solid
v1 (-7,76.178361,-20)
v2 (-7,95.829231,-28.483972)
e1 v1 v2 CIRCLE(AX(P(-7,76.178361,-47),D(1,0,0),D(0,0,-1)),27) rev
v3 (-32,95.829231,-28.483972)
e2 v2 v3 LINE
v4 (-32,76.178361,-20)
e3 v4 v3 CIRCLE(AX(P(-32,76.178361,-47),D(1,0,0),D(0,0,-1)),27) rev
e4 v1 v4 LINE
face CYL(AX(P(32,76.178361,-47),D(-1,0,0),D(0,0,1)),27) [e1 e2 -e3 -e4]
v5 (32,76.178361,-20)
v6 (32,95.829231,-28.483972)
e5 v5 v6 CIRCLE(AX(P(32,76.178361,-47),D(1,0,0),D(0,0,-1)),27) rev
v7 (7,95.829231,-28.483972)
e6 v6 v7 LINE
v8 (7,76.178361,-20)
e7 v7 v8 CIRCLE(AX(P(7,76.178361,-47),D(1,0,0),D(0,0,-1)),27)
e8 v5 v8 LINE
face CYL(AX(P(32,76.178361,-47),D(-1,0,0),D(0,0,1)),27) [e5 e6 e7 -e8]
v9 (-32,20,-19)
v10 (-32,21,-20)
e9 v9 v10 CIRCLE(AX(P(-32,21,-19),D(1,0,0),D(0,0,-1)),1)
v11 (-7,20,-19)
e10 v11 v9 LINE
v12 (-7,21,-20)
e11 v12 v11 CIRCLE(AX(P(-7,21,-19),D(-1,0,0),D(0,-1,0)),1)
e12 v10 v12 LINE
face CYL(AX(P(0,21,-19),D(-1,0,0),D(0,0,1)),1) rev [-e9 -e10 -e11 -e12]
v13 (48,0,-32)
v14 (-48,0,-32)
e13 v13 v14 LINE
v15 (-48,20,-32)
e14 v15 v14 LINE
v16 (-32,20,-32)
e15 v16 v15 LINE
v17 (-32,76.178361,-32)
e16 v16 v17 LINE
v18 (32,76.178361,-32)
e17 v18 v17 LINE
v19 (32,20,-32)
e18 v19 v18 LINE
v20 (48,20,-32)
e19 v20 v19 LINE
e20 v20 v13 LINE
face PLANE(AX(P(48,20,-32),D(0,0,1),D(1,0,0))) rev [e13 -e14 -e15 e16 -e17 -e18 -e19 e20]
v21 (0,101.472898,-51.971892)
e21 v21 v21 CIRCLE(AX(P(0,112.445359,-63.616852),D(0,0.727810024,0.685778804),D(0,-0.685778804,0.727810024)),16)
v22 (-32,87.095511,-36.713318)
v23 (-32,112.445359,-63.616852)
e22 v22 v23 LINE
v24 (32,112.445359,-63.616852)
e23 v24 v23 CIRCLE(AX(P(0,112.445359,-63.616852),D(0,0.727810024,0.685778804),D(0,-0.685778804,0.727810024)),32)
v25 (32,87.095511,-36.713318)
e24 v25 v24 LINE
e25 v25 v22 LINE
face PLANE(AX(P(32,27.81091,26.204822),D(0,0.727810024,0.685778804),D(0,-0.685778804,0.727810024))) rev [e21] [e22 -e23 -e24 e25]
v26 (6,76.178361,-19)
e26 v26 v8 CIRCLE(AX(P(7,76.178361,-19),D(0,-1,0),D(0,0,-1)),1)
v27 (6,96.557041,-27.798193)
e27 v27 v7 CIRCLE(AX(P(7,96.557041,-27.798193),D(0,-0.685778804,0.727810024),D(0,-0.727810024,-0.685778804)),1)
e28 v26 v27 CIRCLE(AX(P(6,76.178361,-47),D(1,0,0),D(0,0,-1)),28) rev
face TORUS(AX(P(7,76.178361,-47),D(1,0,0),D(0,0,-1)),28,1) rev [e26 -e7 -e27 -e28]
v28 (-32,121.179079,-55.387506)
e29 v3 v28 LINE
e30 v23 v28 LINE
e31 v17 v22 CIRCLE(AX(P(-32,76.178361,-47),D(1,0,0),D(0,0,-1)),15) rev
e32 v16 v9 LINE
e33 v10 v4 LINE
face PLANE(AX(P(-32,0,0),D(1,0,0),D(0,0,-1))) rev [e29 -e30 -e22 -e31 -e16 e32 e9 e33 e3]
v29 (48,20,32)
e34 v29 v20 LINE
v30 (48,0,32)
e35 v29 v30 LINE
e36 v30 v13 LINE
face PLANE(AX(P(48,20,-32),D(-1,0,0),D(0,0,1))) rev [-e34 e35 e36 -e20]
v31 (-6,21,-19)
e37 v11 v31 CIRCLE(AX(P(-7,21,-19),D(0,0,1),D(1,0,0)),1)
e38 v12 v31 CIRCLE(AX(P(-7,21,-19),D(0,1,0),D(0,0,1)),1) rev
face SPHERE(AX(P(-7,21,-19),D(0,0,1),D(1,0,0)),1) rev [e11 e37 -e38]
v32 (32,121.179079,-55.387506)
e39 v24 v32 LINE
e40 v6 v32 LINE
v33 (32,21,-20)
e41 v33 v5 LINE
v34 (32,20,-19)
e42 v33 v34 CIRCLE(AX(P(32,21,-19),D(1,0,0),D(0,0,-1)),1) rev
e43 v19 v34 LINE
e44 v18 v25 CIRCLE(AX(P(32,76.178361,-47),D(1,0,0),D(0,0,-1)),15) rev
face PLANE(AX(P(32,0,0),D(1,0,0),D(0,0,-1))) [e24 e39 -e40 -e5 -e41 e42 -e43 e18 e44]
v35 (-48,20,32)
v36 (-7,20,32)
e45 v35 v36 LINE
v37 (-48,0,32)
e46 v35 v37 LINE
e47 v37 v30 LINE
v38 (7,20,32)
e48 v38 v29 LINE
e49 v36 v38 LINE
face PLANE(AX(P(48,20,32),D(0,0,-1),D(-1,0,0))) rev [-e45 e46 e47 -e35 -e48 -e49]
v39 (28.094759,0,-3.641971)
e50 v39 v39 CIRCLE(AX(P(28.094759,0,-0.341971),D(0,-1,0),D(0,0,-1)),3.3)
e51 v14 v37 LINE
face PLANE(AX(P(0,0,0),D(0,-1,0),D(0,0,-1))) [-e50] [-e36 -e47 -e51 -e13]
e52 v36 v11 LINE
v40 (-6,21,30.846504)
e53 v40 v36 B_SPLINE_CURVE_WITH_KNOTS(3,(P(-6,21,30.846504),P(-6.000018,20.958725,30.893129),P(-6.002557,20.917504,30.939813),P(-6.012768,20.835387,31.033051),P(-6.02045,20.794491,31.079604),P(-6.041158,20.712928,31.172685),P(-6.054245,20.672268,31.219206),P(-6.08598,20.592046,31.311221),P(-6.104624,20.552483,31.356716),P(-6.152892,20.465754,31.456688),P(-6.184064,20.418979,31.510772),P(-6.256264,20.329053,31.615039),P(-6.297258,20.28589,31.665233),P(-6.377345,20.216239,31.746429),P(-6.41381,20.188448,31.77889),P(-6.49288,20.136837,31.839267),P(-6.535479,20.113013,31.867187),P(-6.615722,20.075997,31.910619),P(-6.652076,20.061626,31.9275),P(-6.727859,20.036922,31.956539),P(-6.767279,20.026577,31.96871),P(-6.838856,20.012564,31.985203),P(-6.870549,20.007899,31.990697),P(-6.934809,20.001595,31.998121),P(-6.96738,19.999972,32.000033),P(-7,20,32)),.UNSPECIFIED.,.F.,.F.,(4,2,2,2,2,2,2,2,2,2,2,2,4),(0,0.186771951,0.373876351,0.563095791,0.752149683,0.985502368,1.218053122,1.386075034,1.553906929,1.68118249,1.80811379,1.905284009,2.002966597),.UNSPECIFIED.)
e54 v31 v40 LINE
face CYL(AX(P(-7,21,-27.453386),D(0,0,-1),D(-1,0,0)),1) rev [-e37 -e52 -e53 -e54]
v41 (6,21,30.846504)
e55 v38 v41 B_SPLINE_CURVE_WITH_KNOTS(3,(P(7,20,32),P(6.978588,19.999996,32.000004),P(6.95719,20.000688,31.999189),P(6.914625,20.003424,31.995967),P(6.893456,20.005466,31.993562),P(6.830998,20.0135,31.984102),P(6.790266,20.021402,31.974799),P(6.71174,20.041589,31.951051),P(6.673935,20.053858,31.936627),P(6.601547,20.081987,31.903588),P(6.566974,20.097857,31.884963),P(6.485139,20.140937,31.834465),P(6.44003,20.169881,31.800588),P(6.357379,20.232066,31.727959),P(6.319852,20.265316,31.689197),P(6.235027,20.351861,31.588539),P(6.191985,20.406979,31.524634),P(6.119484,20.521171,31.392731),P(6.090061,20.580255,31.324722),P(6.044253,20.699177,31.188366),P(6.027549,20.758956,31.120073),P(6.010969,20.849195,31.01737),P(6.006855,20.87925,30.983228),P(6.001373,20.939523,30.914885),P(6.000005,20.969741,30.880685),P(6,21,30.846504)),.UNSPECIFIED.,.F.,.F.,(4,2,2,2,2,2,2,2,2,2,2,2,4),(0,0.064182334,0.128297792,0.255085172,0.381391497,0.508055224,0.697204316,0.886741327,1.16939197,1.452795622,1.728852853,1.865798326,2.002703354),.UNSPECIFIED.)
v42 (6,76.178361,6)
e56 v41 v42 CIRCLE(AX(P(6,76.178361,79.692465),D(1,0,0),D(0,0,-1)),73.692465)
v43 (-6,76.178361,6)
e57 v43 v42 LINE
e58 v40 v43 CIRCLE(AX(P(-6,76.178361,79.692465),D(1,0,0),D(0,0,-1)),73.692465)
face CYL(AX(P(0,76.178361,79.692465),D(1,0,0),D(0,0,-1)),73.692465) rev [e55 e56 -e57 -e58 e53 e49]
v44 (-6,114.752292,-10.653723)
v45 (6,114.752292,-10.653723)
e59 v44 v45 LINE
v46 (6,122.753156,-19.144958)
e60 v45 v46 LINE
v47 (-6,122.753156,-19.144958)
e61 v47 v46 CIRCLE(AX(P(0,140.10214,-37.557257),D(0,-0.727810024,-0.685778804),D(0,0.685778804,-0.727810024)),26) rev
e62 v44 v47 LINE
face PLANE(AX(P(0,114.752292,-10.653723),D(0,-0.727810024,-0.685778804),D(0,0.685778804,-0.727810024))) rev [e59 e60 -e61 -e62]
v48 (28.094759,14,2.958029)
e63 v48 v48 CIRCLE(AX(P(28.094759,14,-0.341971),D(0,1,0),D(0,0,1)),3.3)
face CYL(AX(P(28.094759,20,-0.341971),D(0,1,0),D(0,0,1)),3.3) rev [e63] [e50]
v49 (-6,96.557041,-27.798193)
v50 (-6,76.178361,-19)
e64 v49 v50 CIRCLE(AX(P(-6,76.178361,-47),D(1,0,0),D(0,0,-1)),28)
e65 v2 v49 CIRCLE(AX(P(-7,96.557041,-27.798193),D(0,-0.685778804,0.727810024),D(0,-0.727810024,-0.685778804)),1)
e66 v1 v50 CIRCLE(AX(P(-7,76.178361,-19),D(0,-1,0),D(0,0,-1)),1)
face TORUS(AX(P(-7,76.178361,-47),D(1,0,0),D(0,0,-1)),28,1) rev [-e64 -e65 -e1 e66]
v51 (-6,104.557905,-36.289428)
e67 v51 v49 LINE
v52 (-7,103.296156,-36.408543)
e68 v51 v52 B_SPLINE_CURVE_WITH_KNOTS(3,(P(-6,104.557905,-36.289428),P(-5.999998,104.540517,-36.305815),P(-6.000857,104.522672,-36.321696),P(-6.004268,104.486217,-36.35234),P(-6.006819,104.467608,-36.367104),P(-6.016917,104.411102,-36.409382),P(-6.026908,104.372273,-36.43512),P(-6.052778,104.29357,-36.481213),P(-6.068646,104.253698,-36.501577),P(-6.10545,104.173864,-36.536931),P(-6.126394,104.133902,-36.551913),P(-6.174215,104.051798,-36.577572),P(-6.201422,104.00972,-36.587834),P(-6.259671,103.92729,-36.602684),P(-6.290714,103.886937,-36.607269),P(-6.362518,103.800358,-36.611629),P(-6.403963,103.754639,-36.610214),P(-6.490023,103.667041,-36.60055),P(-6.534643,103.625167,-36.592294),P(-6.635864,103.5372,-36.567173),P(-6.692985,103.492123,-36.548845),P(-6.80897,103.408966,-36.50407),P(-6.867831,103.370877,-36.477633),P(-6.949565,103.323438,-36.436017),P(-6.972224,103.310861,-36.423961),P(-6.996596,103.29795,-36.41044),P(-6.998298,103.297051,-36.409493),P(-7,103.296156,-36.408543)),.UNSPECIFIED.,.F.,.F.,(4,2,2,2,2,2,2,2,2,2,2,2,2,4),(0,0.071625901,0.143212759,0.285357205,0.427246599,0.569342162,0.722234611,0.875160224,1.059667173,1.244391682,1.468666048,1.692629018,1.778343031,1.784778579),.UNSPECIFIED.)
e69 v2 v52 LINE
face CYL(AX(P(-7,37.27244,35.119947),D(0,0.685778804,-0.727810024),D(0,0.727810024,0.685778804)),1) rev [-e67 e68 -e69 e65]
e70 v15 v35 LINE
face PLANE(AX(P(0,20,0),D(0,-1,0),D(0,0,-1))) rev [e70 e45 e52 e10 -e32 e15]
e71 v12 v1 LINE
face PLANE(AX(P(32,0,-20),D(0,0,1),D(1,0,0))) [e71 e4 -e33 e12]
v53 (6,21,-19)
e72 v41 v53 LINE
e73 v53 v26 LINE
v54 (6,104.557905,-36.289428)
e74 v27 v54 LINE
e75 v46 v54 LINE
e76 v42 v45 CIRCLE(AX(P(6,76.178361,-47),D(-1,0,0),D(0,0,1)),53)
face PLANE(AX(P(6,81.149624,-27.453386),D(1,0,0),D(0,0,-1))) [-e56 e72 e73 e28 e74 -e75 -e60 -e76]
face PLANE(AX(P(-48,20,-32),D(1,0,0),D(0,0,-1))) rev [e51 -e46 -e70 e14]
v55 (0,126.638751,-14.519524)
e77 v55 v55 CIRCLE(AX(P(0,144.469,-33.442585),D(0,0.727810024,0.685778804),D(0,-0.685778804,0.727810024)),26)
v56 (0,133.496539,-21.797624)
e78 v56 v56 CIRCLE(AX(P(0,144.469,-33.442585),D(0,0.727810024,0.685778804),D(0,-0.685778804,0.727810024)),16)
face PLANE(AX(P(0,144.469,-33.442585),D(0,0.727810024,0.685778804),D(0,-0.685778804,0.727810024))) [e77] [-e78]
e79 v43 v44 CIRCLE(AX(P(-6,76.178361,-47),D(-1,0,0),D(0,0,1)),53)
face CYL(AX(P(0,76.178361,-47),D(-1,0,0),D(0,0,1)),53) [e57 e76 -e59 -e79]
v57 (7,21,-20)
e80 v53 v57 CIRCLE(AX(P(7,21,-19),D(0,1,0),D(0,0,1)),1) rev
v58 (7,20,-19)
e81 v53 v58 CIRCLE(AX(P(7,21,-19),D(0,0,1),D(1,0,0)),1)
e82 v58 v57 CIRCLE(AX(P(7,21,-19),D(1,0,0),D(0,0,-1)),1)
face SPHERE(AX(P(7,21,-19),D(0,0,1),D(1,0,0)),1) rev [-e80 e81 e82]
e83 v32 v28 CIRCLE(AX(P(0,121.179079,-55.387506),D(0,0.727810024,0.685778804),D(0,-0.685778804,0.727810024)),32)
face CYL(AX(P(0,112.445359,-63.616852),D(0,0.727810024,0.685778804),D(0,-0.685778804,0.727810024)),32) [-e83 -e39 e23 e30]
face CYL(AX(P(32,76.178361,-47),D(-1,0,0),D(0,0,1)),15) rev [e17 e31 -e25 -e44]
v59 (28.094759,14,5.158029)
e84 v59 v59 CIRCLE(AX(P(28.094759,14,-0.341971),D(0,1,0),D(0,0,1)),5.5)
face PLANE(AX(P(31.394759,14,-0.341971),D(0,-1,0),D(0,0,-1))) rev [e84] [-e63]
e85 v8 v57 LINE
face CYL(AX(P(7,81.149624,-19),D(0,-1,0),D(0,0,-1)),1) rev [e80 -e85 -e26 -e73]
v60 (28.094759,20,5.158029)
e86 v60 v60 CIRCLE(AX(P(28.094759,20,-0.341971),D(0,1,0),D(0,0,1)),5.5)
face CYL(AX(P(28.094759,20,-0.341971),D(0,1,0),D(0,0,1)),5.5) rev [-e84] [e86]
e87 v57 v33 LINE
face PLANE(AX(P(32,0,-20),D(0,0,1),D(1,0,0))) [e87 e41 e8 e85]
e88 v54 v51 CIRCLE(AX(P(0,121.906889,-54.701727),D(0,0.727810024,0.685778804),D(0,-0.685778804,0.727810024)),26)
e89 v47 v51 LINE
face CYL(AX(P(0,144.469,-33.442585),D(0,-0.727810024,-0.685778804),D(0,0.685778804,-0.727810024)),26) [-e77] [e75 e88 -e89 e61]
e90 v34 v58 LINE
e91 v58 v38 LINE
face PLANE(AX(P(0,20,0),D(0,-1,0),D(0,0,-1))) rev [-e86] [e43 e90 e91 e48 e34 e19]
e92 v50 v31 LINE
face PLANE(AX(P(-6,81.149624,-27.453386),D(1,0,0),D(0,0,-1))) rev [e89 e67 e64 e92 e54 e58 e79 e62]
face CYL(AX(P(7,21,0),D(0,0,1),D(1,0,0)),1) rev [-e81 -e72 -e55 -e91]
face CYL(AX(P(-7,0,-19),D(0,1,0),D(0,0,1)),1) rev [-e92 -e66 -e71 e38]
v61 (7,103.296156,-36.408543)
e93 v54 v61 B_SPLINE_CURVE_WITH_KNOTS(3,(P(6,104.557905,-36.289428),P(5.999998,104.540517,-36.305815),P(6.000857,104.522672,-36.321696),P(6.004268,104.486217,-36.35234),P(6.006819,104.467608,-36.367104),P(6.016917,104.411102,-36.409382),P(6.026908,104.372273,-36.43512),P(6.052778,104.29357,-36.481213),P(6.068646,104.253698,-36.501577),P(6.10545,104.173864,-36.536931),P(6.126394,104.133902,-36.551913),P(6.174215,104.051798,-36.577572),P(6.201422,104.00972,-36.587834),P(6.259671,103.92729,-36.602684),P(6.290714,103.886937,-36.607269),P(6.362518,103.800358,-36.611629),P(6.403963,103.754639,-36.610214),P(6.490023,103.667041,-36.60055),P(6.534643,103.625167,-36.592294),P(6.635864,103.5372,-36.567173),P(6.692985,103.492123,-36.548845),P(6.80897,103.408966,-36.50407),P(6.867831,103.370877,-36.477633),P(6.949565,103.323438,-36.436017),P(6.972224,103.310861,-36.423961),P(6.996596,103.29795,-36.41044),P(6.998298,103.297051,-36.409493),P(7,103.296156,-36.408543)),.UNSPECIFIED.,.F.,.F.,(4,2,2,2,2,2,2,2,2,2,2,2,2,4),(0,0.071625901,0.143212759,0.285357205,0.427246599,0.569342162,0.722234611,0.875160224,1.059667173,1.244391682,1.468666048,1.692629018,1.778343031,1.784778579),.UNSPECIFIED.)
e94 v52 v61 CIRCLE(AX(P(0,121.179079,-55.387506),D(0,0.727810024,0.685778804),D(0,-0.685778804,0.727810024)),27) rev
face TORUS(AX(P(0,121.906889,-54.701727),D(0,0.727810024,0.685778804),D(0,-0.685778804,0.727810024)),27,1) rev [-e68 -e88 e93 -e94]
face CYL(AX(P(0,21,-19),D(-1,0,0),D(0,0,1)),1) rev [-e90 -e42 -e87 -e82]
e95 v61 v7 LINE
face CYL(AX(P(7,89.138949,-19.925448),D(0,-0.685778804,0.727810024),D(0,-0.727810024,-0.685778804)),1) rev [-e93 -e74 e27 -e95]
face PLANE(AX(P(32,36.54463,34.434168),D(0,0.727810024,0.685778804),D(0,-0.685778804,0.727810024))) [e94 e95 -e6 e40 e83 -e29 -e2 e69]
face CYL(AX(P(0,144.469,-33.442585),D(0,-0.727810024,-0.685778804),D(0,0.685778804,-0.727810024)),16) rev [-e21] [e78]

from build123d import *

# Parameters (mm, degrees)
SKETCH4_W                      = 96
SKETCH4_H                      = 64
BOSS_EXTRUDE1_DEPTH            = 20
BOSS_EXTRUDE2_DEPTH            = 32
BOSS_EXTRUDE3_DEPTH            = 12
SKETCH7_R                      = 26
SKETCH7_R_2                    = 16
BOSS_EXTRUDE4_DEPTH            = 32
CUT_EXTRUDE1_START             = -32
SKETCH8_R                      = 16
CUT_EXTRUDE1_DEPTH             = 32
RIB1_START                     = -6
RIB1_DEPTH                     = 12
FILLET1_R                      = 1
CBORE_FOR_M6_SHCS2_D           = 6.6
CBORE_FOR_M6_SHCS2_CBORE_D     = 11
CBORE_FOR_M6_SHCS2_CBORE_DEPTH = 6


with BuildPart() as part:
    # Sketch4 → Boss-Extrude1 (new body)
    with BuildSketch(Plane(origin=(0, 0, 0), x_dir=(1, 0, 0), z_dir=(0, 1, 0))):
        Rectangle(SKETCH4_W, SKETCH4_H)
    extrude(amount=BOSS_EXTRUDE1_DEPTH)

    # Sketch5 → Boss-Extrude2 (add, symmetric)
    with BuildSketch(Plane(origin=(0, 0, 0), x_dir=(0, 0, -1), z_dir=(1, 0, 0))):
        with BuildLine():
            Line((20, 0), (32, 0))
            Line((32, 0), (32, 76.178360588))
            ThreePointArc((32, 76.178360588), (33.228648741, 82.123937475), (36.713317934, 87.095510953))
            Line((36.713317934, 87.095510953), (63.616851895, 112.445358766))
            Line((63.616851895, 112.445358766), (55.387506243, 121.179079058))
            Line((55.387506243, 121.179079058), (28.483972282, 95.829231245))
            ThreePointArc((28.483972282, 95.829231245), (22.211567734, 86.880398983), (20, 76.178360588))
            Line((20, 76.178360588), (20, 0))
        make_face()
    extrude(amount=BOSS_EXTRUDE2_DEPTH, both=True)

    # Sketch6 → Boss-Extrude3 (add)
    with BuildSketch(Plane(origin=(0, 36.544630029, 34.434168053), x_dir=(1, 0, 0), z_dir=(0, 0.7278100243036815, 0.6857788043699474))):
        with BuildLine():
            Line((-32, 123.413626216), (32, 123.413626216))
            ThreePointArc((32, 123.413626216), (0, 155.413626216), (-32, 123.413626216))
        make_face()
    extrude(amount=-BOSS_EXTRUDE3_DEPTH)

    # Sketch7 → Boss-Extrude4 (add)
    with BuildSketch(Plane(origin=(0, 36.544630029, 34.434168053), x_dir=(1, 0, 0), z_dir=(0, 0.7278100243036815, 0.6857788043699474))):
        with Locations(Location((0, 123.413626216, 0), (0, 0, 270))):
            Circle(SKETCH7_R)
        with Locations(Location((0, 123.413626216, 0), (0, 0, 270))):
            Circle(SKETCH7_R_2, mode=Mode.SUBTRACT)
    extrude(amount=BOSS_EXTRUDE4_DEPTH)

    # Sketch8 → Cut-Extrude1 (cut)
    with BuildSketch(Plane(origin=(0, 36.544630029, 34.434168053), x_dir=(1, 0, 0), z_dir=(0, 0.7278100243036815, 0.6857788043699474)).offset(CUT_EXTRUDE1_START)):
        with Locations(Location((0, 123.413626216, 0), (0, 0, 270))):
            Circle(SKETCH8_R)
    extrude(amount=CUT_EXTRUDE1_DEPTH, mode=Mode.SUBTRACT)

    # Rib1: read off the stored shape, not the designer's step
    # Rib1 outline → Rib1 (add)
    with BuildSketch(Plane(origin=(0, 0, 0), x_dir=(0, 0, -1), z_dir=(1, 0, 0)).offset(RIB1_START)):
        with BuildLine():
            Line((28.483972282, 95.829231245), (36.975207197, 103.830095115))
            Line((36.975207197, 103.830095115), (19.144958284, 122.753155747))
            Line((19.144958284, 122.753155747), (10.653723368, 114.752291877))
            ThreePointArc((10.653723368, 114.752291877), (-1.658774448, 97.186065586), (-6, 76.178360588))
            ThreePointArc((-6, 76.178360588), (-12.815134364, 45.226752398), (-32, 20))
            Line((-32, 20), (20, 20))
            Line((20, 20), (20, 76.178360588))
            ThreePointArc((20, 76.178360588), (22.211567734, 86.880398983), (28.483972282, 95.829231245))
        make_face()
    extrude(amount=RIB1_DEPTH)

    # Fillet1
    # the kernel refuses this fillet: 1 mm, written as the material it adds along each edge
    with BuildSketch(Plane(origin=(7, 21, -19), x_dir=(-1, 0, 0), z_dir=(0, 0, -1))) as fillet1_piece_1_section:
        Polygon((0, 0), (FILLET1_R * 1.02, 0), (FILLET1_R * 1.02, -FILLET1_R * 1.02), (0, -FILLET1_R * 1.02), align=None)
    fillet1_piece_1 = extrude(amount=FILLET1_R * 1.02, mode=Mode.PRIVATE)
    fillet1_piece_1 = fillet1_piece_1 - Plane(origin=(7, 21, -19), x_dir=(0.7071067811865475, 0.7071067811865475, 0), z_dir=(0, 0, -1)) * Sphere(FILLET1_R, mode=Mode.PRIVATE)
    add(fillet1_piece_1)
    with BuildSketch(Plane(origin=(-7, 21, -19), x_dir=(1, 0, 0), z_dir=(0, 0, -1))) as fillet1_piece_2_section:
        Polygon((0, 0), (FILLET1_R * 1.02, 0), (FILLET1_R * 1.02, FILLET1_R * 1.02), (0, FILLET1_R * 1.02), align=None)
    fillet1_piece_2 = extrude(amount=FILLET1_R * 1.02, mode=Mode.PRIVATE)
    fillet1_piece_2 = fillet1_piece_2 - Plane(origin=(-7, 21, -19), x_dir=(-0.7071067811865475, 0.7071067811865475, 0), z_dir=(0, 0, -1)) * Sphere(FILLET1_R, mode=Mode.PRIVATE)
    add(fillet1_piece_2)
    with BuildSketch(Plane(origin=(7, 20, -20), x_dir=(0, 0, 1), z_dir=(1, 0, 0)), Plane(origin=(-32, 20, -20), x_dir=(0, 0, 1), z_dir=(1, 0, 0))) as fillet1_piece_3:
        with BuildLine():
            CenterArc((FILLET1_R, -FILLET1_R), FILLET1_R, 90, 90)
            Line((0, -FILLET1_R), (0, 0))
            Line((0, 0), (FILLET1_R, 0))
        make_face()
    extrude(amount=25)
    with BuildSketch(Plane(origin=(0, 121.179079058, -55.387506243), x_dir=(0.13576209912112866, -0.6794294979898851, 0.7210715704445971), z_dir=(-0.990741465995153, -0.09310277001404191, 0.09880901666086746))) as fillet1_piece_4:
        with BuildLine():
            CenterArc((26 + FILLET1_R, FILLET1_R), FILLET1_R, 180, 90)
            Line((26, FILLET1_R), (26, 0))
            Line((26, 0), (26 + FILLET1_R, 0))
        make_face()
    revolve(axis=Axis((0, 121.179079058, -55.387506243), (0, 0.7278100243036815, 0.6857788043699474)), revolution_arc=344.394618628)
    with BuildSketch(Plane(origin=(6, 21, -20), x_dir=(0, 0, 1), z_dir=(0, 1, 0)), Plane(origin=(-6, 21, -20), x_dir=(-1, 0, 0), z_dir=(0, 1, 0))) as fillet1_piece_5:
        with BuildLine():
            CenterArc((FILLET1_R, FILLET1_R), FILLET1_R, 180, 90)
            Line((0, FILLET1_R), (0, 0))
            Line((0, 0), (FILLET1_R, 0))
        make_face()
    extrude(amount=55.178360588)
    with BuildSketch(Plane(origin=(6, 76.178360589, -47.000000001), x_dir=(0, -1.928886679962007e-11, 1.0), z_dir=(0, -1.0, -1.928886679962007e-11))) as fillet1_piece_6:
        with BuildLine():
            CenterArc((27.000000001 + FILLET1_R, -FILLET1_R), FILLET1_R, 90, 90)
            Line((27.000000001, -FILLET1_R), (27.000000001, 0))
            Line((27.000000001, 0), (27.000000001 + FILLET1_R, 0))
        make_face()
    revolve(axis=Axis((6, 76.178360589, -47.000000001), (-1, 0, 0)), revolution_arc=46.703113482)
    with BuildSketch(Plane(origin=(6, 95.829231245, -28.483972282), x_dir=(0, 0.7278100243012071, 0.6857788043725734), z_dir=(0, 0.6857788043725734, -0.7278100243012071)), Plane(origin=(-6, 95.829231245, -28.483972282), x_dir=(-1.0, -2.1788147308559408e-10, -2.0529876082846627e-10), z_dir=(0, 0.6857788043725734, -0.7278100243012071))) as fillet1_piece_7:
        with BuildLine():
            CenterArc((FILLET1_R, FILLET1_R), FILLET1_R, 180, 90)
            Line((-FILLET1_R * 2.99381074515e-10, FILLET1_R), (0, 0))
            Line((0, 0), (FILLET1_R, 0))
        make_face()
    extrude(amount=14.166828749)
    with BuildSketch(Plane(origin=(6, 20, 34.5), x_dir=(1, 0, 0), z_dir=(0, 0, -1))) as fillet1_piece_8_section:
        with BuildLine():
            CenterArc((FILLET1_R, -FILLET1_R), FILLET1_R, 90, 90)
            Line((0, -FILLET1_R), (0, 0))
            Line((0, 0), (FILLET1_R, 0))
        make_face()
    fillet1_piece_8 = extrude(amount=53.5, mode=Mode.PRIVATE)
    fillet1_piece_8 = fillet1_piece_8 - Plane(origin=(6, 76.178360589, 79.692465356), x_dir=(0, -1.8148557691731866e-11, -1.0), z_dir=(-1, 0, 0)) * Cylinder(73.692465356, 111, mode=Mode.PRIVATE)
    add(fillet1_piece_8)
    with BuildSketch(Plane(origin=(-6, 20, 34.5), x_dir=(-1, 0, 0), z_dir=(0, 0, -1))) as fillet1_piece_9_section:
        with BuildLine():
            CenterArc((FILLET1_R, FILLET1_R), FILLET1_R, 180, 90)
            Line((0, FILLET1_R), (0, 0))
            Line((0, 0), (FILLET1_R, 0))
        make_face()
    fillet1_piece_9 = extrude(amount=53.5, mode=Mode.PRIVATE)
    fillet1_piece_9 = fillet1_piece_9 - Plane(origin=(-6, 76.178360589, 79.692465356), x_dir=(0, -1.8148557691731866e-11, -1.0), z_dir=(-1, 0, 0)) * Cylinder(73.692465356, 111, mode=Mode.PRIVATE)
    add(fillet1_piece_9)
    with BuildSketch(Plane(origin=(-6, 76.178360589, -47.000000001), x_dir=(0, -1.928886679962007e-11, 1.0), z_dir=(0, -1.0, -1.928886679962007e-11))) as fillet1_piece_10:
        with BuildLine():
            CenterArc((27.000000001 + FILLET1_R, FILLET1_R), FILLET1_R, 180, 90)
            Line((27.000000001 + FILLET1_R, 0), (27.000000001, 0))
            Line((27.000000001, 0), (27.000000001, FILLET1_R))
        make_face()
    revolve(axis=Axis((-6, 76.178360589, -47.000000001), (-1, 0, 0)), revolution_arc=46.703113482)

    # CBORE for M6 SHCS2 (through all)
    with Locations(Plane(origin=(28.094759236, 20, -0.341970782), x_dir=(0, 0, 1), z_dir=(0, 1, 0))):
        with Locations((0, 0)):
            CounterBoreHole(CBORE_FOR_M6_SHCS2_D / 2, CBORE_FOR_M6_SHCS2_CBORE_D / 2, CBORE_FOR_M6_SHCS2_CBORE_DEPTH)


solid = part.part
